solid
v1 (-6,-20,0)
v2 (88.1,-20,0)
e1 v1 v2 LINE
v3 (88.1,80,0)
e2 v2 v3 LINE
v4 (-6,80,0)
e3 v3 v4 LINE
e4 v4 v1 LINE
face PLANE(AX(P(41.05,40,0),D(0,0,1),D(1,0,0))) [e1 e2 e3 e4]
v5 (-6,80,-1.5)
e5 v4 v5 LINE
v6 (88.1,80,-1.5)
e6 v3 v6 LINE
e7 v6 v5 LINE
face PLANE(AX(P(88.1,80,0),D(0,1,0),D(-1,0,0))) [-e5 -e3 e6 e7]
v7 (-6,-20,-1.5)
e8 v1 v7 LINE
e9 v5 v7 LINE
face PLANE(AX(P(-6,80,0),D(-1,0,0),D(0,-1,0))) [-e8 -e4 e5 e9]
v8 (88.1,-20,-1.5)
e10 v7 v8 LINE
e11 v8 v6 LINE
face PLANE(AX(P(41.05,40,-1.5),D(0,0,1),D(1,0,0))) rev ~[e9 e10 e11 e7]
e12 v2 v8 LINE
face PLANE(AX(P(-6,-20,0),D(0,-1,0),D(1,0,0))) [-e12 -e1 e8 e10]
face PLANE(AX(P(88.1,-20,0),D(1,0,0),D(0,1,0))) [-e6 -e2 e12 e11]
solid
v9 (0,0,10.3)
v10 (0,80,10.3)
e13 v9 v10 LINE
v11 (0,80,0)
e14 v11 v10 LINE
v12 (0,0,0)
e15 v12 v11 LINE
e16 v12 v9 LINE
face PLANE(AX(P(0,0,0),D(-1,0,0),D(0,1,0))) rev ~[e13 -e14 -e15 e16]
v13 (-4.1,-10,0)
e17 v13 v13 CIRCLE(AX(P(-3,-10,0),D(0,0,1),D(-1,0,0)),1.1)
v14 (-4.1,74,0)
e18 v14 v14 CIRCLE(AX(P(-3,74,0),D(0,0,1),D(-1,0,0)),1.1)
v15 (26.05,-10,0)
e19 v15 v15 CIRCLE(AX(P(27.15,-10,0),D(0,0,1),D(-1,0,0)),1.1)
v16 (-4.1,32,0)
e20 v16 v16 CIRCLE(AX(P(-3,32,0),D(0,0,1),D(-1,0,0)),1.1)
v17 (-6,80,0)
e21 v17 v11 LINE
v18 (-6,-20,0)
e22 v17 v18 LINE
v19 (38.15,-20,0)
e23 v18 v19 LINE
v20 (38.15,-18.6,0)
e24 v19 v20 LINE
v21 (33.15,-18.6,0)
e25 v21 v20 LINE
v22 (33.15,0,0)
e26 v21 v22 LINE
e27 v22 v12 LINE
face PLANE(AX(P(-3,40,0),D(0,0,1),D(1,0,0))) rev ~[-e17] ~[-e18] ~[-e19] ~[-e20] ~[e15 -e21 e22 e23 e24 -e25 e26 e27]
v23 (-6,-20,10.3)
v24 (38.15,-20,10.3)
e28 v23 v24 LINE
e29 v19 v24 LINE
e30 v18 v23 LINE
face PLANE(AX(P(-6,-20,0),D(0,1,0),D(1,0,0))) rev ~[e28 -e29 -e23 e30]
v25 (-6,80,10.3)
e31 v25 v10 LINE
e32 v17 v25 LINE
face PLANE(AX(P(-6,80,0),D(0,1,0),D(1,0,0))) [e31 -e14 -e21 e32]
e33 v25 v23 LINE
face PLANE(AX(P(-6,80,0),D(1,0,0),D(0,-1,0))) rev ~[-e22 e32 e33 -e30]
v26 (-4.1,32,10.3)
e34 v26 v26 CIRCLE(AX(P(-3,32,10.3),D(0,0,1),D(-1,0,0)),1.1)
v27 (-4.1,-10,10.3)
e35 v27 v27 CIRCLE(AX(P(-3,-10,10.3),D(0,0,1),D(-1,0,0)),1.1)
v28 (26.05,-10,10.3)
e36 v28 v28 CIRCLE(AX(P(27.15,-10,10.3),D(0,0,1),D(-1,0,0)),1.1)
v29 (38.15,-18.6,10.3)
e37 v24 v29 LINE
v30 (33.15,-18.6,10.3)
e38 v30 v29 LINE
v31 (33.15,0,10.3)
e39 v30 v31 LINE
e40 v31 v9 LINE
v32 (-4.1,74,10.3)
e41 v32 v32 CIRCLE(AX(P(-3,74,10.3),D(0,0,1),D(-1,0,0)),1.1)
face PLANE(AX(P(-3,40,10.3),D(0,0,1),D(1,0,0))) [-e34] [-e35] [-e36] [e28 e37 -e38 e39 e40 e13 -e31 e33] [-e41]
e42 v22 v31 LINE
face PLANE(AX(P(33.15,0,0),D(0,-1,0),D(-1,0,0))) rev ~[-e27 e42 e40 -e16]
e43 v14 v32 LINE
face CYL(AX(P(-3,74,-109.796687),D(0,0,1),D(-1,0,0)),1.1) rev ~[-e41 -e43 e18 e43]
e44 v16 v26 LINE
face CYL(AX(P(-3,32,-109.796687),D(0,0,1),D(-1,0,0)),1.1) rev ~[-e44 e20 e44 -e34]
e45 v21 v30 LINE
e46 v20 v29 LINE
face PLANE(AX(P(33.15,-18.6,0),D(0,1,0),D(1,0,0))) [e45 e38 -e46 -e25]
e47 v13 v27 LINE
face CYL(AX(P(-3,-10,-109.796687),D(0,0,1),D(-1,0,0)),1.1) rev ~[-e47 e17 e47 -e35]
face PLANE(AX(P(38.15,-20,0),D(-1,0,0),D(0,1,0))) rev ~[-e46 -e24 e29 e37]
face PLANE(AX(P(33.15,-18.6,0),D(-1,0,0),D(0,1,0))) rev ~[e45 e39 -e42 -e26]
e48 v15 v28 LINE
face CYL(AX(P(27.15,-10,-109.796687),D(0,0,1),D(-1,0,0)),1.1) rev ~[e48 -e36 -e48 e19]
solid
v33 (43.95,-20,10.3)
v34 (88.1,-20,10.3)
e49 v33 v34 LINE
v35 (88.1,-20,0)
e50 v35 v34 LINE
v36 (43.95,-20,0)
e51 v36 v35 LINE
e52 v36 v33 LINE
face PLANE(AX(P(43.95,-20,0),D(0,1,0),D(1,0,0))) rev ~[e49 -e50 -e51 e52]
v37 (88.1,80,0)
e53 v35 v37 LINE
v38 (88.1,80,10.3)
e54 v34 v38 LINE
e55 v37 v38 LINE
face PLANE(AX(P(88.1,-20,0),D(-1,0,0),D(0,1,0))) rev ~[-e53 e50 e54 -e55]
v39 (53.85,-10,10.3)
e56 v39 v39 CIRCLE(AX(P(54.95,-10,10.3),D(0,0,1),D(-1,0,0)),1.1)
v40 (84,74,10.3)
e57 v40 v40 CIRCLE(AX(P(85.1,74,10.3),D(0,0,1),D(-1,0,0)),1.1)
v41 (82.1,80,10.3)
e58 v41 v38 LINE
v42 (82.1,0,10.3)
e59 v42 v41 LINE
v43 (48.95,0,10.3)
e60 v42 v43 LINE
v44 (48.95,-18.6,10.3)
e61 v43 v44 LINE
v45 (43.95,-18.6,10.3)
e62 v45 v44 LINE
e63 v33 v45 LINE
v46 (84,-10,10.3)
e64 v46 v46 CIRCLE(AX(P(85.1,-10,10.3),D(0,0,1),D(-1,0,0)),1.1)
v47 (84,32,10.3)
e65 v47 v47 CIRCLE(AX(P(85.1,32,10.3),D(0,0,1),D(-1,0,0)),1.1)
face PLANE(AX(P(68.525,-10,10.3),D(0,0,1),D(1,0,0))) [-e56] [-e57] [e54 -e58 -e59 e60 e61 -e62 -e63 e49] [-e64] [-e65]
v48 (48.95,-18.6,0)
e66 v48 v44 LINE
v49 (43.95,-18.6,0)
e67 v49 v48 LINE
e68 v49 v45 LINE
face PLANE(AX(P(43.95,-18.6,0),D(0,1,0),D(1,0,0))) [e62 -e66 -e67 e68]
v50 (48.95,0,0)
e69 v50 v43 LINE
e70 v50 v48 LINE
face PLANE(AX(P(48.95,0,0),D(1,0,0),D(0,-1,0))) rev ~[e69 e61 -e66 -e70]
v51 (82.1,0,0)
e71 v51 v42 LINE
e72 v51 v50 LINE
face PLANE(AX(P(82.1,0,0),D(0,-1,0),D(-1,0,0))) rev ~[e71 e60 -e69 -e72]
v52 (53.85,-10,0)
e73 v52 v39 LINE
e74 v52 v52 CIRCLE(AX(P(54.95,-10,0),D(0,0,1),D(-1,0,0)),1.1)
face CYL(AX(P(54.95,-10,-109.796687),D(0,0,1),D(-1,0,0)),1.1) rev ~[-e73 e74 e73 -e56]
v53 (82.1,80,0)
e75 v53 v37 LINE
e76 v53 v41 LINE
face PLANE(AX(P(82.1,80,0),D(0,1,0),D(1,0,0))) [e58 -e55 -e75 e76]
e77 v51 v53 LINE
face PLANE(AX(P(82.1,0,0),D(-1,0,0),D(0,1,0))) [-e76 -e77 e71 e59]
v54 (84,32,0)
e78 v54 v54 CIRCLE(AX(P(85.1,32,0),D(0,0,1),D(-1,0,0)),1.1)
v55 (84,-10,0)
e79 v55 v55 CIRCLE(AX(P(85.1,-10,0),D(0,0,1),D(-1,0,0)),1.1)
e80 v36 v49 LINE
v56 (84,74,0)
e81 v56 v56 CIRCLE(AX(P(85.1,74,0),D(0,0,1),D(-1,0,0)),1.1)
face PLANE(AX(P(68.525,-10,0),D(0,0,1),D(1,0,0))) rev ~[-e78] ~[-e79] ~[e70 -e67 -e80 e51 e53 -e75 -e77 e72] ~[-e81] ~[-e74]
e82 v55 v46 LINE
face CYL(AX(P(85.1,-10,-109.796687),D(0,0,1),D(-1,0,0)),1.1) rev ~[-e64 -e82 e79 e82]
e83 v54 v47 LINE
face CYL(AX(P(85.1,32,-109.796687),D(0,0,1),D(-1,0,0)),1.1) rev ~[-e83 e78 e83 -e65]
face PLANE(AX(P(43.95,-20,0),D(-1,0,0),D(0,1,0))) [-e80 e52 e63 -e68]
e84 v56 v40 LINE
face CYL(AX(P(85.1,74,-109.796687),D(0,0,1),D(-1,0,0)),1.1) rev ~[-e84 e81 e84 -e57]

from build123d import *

# Parameters (mm, degrees)
F0_W     = 6
F0_H     = 80
F0_W_2   = 5
F0_H_2   = 1.4
F1_DEPTH = 10.3
F0_W_3   = 5.8
F2_DEPTH = 1.5
F3_D     = 2.2
F3_2_D   = 2.2


with BuildPart() as f1:
    # F0 (on Top) → F1 (new body)
    with BuildSketch(Plane.XY):
        with Locations((-3, 40)):
            Rectangle(F0_W, F0_H)
        Polygon((33.15, 0), (0, 0), (-6, 0), (-6, -20), (33.15, -20), (33.15, -18.6), align=None)
        with Locations((35.65, -19.3)):
            Rectangle(F0_W_2, F0_H_2)
    extrude(amount=F1_DEPTH)

    # F3 (through all)
    with Locations(Plane(origin=(0, 0, 0), x_dir=(1, 0, 0), z_dir=(0, 0, -1))):
        with Locations((-3, -74), (85.1, -74), (85.1, -32), (-3, -32), (-3, 10), (27.15, 10), (54.95, 10), (85.1, 10)):
            Hole(F3_D / 2)


with BuildPart() as f1b:
    # F0 (on Top) → F1, piece 2 (new body)
    with BuildSketch(Plane.XY):
        Polygon((82.1, 0), (48.95, 0), (48.95, -18.6), (48.95, -20), (88.1, -20), (88.1, 0), align=None)
        with Locations((85.1, 40)):
            Rectangle(F0_W, F0_H)
        with Locations((46.45, -19.3)):
            Rectangle(F0_W_2, F0_H_2)
    extrude(amount=F1_DEPTH)

    # F3#2 (through all)
    with Locations(Plane(origin=(0, 0, 0), x_dir=(1, 0, 0), z_dir=(0, 0, -1))):
        with Locations((-3, -74), (85.1, -74), (85.1, -32), (-3, -32), (-3, 10), (27.15, 10), (54.95, 10), (85.1, 10)):
            Hole(F3_2_D / 2)


with BuildPart() as f2:
    # F0 (on Top) → F2 (new body)
    with BuildSketch(Plane.XY):
        Polygon((0, 80), (0, 0), (33.15, 0), (48.95, 0), (82.1, 0), (82.1, 80), align=None)
        with Locations((-3, 40)):
            Rectangle(F0_W, F0_H)
        Polygon((33.15, 0), (0, 0), (-6, 0), (-6, -20), (33.15, -20), (33.15, -18.6), align=None)
        Polygon((82.1, 0), (48.95, 0), (48.95, -18.6), (48.95, -20), (88.1, -20), (88.1, 0), align=None)
        with Locations((35.65, -19.3)):
            Rectangle(F0_W_2, F0_H_2)
        with Locations((85.1, 40)):
            Rectangle(F0_W, F0_H)
        with Locations((46.45, -19.3)):
            Rectangle(F0_W_2, F0_H_2)
        with Locations((41.05, -19.3)):
            Rectangle(F0_W_3, F0_H_2)
        Polygon((48.95, 0), (33.15, 0), (33.15, -18.6), (38.15, -18.6), (43.95, -18.6), (48.95, -18.6), align=None)
    extrude(amount=-F2_DEPTH)


solid = Compound([f1.part, f1b.part, f2.part])
